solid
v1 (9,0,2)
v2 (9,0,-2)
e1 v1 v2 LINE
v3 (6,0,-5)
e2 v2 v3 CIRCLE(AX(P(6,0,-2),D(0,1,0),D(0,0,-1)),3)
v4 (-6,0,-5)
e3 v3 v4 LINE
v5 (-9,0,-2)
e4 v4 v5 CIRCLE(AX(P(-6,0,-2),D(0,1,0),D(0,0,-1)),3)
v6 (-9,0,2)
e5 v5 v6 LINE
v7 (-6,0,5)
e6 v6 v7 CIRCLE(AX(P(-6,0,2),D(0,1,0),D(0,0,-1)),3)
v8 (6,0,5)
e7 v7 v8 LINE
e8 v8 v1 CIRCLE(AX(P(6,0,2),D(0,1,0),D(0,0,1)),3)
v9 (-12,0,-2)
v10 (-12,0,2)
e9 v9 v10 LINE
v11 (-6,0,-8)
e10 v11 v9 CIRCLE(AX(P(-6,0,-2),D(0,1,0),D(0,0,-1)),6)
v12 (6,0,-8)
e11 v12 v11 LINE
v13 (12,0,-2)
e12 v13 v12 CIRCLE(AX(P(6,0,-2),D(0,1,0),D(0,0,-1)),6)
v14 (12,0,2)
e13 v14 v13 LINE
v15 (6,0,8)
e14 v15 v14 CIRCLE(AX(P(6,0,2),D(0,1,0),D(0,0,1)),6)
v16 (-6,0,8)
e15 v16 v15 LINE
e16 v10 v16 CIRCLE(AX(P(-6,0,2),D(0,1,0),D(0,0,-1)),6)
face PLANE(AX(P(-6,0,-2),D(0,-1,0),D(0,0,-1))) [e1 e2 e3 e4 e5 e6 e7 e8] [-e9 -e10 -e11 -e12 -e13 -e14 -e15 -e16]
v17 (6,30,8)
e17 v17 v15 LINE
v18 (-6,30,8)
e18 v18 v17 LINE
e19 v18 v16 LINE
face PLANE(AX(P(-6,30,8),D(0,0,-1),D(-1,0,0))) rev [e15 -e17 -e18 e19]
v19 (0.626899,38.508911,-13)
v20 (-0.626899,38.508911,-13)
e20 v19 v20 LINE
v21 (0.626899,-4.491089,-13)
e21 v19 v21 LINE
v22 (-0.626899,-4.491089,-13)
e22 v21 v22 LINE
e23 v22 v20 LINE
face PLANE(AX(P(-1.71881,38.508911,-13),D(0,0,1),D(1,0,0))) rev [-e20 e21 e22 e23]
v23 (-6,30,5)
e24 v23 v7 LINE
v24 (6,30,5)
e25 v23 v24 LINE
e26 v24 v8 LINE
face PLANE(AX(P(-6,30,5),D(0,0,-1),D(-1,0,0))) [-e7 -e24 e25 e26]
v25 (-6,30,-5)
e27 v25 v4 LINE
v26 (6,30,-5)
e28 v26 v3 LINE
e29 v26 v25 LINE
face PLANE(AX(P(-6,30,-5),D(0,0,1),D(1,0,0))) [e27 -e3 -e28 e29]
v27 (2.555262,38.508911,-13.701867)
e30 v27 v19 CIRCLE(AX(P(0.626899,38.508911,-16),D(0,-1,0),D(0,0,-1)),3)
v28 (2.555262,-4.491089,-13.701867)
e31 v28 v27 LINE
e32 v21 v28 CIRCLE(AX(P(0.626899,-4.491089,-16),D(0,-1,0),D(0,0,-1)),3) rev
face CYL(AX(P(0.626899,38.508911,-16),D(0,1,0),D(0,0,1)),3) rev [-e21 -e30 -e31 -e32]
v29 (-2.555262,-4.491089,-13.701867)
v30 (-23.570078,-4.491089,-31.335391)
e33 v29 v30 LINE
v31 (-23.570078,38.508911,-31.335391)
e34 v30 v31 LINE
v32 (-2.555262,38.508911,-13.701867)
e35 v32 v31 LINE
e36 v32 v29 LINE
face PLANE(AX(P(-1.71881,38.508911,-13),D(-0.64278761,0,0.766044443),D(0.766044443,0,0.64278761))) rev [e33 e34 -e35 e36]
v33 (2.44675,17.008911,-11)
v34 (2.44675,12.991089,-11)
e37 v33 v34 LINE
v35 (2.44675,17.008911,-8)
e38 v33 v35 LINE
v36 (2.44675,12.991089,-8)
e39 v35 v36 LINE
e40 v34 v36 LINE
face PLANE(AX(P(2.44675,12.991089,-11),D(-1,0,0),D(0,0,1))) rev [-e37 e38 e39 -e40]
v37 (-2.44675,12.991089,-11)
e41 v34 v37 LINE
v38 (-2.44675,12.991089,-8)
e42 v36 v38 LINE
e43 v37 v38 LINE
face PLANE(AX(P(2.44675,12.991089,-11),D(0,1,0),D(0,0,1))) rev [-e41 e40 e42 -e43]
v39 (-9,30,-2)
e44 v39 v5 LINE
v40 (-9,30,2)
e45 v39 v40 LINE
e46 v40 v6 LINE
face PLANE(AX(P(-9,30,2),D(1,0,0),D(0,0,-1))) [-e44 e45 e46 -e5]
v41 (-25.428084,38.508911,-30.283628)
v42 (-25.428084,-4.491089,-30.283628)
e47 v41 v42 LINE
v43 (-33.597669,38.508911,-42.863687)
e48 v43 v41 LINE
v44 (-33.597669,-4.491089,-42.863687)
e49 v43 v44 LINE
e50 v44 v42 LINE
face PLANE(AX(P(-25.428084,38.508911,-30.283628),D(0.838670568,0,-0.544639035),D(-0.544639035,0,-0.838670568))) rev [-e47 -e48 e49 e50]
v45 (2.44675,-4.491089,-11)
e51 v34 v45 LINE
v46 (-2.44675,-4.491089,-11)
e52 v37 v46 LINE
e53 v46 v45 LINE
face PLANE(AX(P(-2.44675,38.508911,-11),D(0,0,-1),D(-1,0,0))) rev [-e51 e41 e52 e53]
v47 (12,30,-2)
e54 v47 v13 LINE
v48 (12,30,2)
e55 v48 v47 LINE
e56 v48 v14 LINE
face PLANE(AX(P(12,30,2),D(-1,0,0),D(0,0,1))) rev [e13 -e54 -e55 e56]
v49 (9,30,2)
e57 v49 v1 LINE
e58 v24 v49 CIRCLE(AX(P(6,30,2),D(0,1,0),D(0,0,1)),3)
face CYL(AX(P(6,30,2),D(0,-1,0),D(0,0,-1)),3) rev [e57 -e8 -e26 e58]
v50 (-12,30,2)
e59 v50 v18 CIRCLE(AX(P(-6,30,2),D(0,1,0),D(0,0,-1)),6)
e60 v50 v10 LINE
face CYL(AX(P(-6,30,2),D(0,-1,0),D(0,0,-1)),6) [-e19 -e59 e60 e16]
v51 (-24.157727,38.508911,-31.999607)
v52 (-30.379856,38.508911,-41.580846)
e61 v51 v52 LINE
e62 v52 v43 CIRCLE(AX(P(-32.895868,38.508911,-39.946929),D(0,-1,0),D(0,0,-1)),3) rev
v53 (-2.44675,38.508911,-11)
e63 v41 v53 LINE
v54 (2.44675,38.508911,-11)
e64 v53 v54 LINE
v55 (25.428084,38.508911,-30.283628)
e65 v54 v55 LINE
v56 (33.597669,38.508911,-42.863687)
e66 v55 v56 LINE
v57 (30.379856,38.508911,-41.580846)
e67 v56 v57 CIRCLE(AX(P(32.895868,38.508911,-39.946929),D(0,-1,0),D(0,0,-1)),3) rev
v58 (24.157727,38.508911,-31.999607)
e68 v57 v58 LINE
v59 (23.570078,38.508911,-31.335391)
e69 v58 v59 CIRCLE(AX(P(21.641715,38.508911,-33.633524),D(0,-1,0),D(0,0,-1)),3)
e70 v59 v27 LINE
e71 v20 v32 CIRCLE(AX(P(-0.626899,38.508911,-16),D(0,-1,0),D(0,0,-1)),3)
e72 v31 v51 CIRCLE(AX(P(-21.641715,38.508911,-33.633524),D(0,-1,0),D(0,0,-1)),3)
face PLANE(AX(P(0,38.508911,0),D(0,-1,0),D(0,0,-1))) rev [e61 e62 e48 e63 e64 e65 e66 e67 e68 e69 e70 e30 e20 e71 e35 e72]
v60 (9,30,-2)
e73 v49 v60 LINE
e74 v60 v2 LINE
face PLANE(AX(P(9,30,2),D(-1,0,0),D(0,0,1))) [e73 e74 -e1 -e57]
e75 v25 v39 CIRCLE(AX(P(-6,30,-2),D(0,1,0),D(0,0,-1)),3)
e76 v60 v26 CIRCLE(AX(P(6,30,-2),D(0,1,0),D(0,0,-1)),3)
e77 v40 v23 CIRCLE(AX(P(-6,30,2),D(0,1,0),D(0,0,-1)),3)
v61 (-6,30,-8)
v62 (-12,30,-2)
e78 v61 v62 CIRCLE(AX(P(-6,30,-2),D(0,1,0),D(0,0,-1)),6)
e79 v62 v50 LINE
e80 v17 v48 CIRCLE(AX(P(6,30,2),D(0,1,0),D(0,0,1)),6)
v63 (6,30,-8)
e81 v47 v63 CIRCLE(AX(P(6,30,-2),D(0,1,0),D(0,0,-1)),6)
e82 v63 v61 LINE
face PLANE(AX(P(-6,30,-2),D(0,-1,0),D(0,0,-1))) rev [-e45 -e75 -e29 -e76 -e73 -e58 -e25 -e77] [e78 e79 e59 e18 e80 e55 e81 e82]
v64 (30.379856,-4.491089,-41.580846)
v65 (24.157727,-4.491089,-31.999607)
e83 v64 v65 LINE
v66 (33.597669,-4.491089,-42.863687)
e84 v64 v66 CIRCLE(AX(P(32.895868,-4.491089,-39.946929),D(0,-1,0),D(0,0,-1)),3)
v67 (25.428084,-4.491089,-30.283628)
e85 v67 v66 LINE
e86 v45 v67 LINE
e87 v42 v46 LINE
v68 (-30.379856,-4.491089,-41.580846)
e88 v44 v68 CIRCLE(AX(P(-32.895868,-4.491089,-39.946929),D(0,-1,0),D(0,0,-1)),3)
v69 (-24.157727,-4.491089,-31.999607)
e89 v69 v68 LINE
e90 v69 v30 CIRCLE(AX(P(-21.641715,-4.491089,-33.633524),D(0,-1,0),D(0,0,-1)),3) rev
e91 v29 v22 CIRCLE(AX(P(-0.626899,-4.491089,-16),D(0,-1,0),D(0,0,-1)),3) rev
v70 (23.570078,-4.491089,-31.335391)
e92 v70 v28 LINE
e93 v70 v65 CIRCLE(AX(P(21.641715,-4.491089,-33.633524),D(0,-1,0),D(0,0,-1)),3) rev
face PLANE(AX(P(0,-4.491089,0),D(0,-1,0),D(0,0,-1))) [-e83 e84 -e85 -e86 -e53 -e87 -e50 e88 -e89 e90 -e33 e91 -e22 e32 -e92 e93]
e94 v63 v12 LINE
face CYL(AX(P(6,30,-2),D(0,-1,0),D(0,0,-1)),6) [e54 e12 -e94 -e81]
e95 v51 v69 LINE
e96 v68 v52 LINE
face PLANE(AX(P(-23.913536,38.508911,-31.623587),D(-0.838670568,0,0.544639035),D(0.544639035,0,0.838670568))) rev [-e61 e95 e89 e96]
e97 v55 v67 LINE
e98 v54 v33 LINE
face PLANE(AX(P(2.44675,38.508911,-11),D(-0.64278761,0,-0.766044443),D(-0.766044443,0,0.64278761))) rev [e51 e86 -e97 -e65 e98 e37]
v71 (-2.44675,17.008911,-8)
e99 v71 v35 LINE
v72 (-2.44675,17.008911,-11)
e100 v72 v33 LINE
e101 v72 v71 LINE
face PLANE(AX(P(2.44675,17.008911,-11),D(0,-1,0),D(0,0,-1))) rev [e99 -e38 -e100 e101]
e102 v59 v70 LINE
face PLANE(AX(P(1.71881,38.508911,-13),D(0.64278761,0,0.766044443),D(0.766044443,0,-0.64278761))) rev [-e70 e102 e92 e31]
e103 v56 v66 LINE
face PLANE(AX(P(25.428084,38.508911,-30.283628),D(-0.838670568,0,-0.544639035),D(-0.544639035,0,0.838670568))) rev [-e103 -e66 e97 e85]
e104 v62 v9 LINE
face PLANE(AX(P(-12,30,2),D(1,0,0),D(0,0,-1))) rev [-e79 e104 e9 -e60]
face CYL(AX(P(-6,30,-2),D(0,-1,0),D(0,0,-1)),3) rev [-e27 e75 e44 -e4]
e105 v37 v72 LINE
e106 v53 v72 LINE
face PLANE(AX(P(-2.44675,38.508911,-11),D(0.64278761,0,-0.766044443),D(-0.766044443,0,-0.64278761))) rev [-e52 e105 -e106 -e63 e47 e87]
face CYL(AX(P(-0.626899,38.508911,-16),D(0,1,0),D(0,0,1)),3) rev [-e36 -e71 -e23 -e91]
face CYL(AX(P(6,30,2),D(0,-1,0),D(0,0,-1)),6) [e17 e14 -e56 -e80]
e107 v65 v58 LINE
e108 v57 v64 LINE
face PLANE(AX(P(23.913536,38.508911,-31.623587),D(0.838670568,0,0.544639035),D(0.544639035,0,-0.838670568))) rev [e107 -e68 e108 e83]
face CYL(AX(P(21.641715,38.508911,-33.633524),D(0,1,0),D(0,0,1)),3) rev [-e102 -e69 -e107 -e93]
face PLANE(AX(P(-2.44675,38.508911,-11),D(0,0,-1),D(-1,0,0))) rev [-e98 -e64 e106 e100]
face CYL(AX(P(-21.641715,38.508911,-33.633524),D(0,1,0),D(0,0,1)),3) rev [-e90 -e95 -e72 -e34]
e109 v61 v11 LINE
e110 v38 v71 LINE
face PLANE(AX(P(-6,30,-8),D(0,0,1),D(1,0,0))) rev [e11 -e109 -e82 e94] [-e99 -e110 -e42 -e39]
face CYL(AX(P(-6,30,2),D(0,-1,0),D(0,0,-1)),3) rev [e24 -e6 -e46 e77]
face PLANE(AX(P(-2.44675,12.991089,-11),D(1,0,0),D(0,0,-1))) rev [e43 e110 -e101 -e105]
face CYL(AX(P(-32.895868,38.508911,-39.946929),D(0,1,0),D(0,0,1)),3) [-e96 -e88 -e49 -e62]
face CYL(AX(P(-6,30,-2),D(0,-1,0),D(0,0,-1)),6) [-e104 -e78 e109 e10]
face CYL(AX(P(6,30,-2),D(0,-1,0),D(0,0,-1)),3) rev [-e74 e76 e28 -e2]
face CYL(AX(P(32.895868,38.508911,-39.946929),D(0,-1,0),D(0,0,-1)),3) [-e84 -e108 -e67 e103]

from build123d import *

# Parameters (mm, degrees)
SALIENTE_EXTRUIR1_DEPTH = 30
CROQUIS3_W              = 4.89350096
CROQUIS3_H              = 4.01782184
SALIENTE_EXTRUIR2_DEPTH = 3
SALIENTE_EXTRUIR3_DEPTH = 21.5
REDONDEO2_R             = 3


with BuildPart() as part:
    # Croquis1 → Saliente-Extruir1 (new body)
    with BuildSketch(Plane(origin=(0, 0, 0), x_dir=(1, 0, 0), z_dir=(0, 1, 0))):
        with BuildLine():
            Line((-6, 8), (6, 8))
            ThreePointArc((6, 8), (10.242640687, 6.242640687), (12, 2))
            Line((12, 2), (12, -2))
            ThreePointArc((12, -2), (10.242640687, -6.242640687), (6, -8))
            Line((6, -8), (-6, -8))
            ThreePointArc((-6, -8), (-10.242640687, -6.242640687), (-12, -2))
            Line((-12, -2), (-12, 2))
            ThreePointArc((-12, 2), (-10.242640687, 6.242640687), (-6, 8))
        make_face()
        with BuildLine():
            Line((-6, -5), (6, -5))
            ThreePointArc((6, -5), (8.121320344, -4.121320344), (9, -2))
            Line((9, -2), (9, 2))
            ThreePointArc((9, 2), (8.121320344, 4.121320344), (6, 5))
            Line((6, 5), (-6, 5))
            ThreePointArc((-6, 5), (-8.121320344, 4.121320344), (-9, 2))
            Line((-9, 2), (-9, -2))
            ThreePointArc((-9, -2), (-8.121320344, -4.121320344), (-6, -5))
        make_face(mode=Mode.SUBTRACT)
    extrude(amount=SALIENTE_EXTRUIR1_DEPTH)

    # Croquis3 → Saliente-Extruir2 (add)
    with BuildSketch(Plane(origin=(0, 0, -8), x_dir=(-1, 0, 0), z_dir=(0, 0, -1))):
        with Locations((0, 15)):
            Rectangle(CROQUIS3_W, CROQUIS3_H)
    extrude(amount=SALIENTE_EXTRUIR2_DEPTH)

    # Croquis7 → Saliente-Extruir3 (add, symmetric)
    with BuildSketch(Plane(origin=(0, 17.00891092, 0), x_dir=(1, 0, 0), z_dir=(0, 1, 0))):
        Polygon((-2.44675048, 11), (2.44675048, 11), (25.428083774, 30.283628291), (33.597669299, 42.86368681), (31.920328163, 43.95296488), (23.913536336, 31.623586673), (1.718810011, 13), (-1.718810011, 13), (-23.913536336, 31.623586673), (-31.920328163, 43.95296488), (-33.597669299, 42.86368681), (-25.428083774, 30.283628291), align=None)
    extrude(amount=SALIENTE_EXTRUIR3_DEPTH, both=True)

    # Redondeo2
    # the kernel refuses this fillet: 3 mm, written as the material it adds along each edge
    with BuildSketch(Plane(origin=(-23.913536336, -4.49108908, -31.623586673), x_dir=(0.7660444431189832, 0, 0.6427876096865331), z_dir=(0, 1, 0)), Plane(origin=(23.913536336, -4.49108908, -31.623586673), x_dir=(0.5446390350150309, 0, -0.8386705679454215), z_dir=(0, 1, 0))) as redondeo2_piece_1:
        with BuildLine():
            CenterArc((REDONDEO2_R * 0.149451001349, REDONDEO2_R), REDONDEO2_R, 253, 17)
            Line((-REDONDEO2_R * 0.142920703374, REDONDEO2_R * 0.043695244037), (0, 0))
            Line((0, 0), (REDONDEO2_R * 0.149451001349, 0))
        make_face()
    extrude(amount=43)
    with BuildSketch(Plane(origin=(1.718810011, -4.49108908, -13), x_dir=(0.7660444431189833, 0, -0.6427876096865328), z_dir=(0, 1, 0)), Plane(origin=(-1.718810011, -4.49108908, -13), x_dir=(1, 0, 0), z_dir=(0, 1, 0))) as redondeo2_piece_2:
        with BuildLine():
            CenterArc((REDONDEO2_R * 0.363970234266, REDONDEO2_R), REDONDEO2_R, 230, 40)
            Line((-REDONDEO2_R * 0.27881737542, REDONDEO2_R * 0.233955556881), (0, 0))
            Line((0, 0), (REDONDEO2_R * 0.363970234266, 0))
        make_face()
    extrude(amount=43)
    # the kernel refuses this fillet: 3 mm, written as the material it takes off along each edge
    with BuildSketch(Plane(origin=(31.920328163, -11.562156891, -43.95296488), x_dir=(0.8386705679454225, 0, 0.5446390350150296), z_dir=(0, 1, 0))) as redondeo2_2_piece_1:
        with BuildLine():
            CenterArc((3, -2.828427125), REDONDEO2_R, 109.471220634, 70.528779366)
            Line((0, -2.828427125), (0, 0))
            Line((0, 0), (2, 0))
        make_face()
    extrude(amount=57.142135624, mode=Mode.SUBTRACT)
    with BuildSketch(Plane(origin=(-31.920328163, -11.562156891, -43.95296488), x_dir=(0.5446390350150306, 0, 0.8386705679454217), z_dir=(0, 1, 0))) as redondeo2_2_piece_2:
        with BuildLine():
            CenterArc((2.828427125, -3), REDONDEO2_R, 90, 70.528779366)
            Line((0, -2), (0, 0))
            Line((0, 0), (2.828427125, 0))
        make_face()
    extrude(amount=57.142135624, mode=Mode.SUBTRACT)


solid = part.part
